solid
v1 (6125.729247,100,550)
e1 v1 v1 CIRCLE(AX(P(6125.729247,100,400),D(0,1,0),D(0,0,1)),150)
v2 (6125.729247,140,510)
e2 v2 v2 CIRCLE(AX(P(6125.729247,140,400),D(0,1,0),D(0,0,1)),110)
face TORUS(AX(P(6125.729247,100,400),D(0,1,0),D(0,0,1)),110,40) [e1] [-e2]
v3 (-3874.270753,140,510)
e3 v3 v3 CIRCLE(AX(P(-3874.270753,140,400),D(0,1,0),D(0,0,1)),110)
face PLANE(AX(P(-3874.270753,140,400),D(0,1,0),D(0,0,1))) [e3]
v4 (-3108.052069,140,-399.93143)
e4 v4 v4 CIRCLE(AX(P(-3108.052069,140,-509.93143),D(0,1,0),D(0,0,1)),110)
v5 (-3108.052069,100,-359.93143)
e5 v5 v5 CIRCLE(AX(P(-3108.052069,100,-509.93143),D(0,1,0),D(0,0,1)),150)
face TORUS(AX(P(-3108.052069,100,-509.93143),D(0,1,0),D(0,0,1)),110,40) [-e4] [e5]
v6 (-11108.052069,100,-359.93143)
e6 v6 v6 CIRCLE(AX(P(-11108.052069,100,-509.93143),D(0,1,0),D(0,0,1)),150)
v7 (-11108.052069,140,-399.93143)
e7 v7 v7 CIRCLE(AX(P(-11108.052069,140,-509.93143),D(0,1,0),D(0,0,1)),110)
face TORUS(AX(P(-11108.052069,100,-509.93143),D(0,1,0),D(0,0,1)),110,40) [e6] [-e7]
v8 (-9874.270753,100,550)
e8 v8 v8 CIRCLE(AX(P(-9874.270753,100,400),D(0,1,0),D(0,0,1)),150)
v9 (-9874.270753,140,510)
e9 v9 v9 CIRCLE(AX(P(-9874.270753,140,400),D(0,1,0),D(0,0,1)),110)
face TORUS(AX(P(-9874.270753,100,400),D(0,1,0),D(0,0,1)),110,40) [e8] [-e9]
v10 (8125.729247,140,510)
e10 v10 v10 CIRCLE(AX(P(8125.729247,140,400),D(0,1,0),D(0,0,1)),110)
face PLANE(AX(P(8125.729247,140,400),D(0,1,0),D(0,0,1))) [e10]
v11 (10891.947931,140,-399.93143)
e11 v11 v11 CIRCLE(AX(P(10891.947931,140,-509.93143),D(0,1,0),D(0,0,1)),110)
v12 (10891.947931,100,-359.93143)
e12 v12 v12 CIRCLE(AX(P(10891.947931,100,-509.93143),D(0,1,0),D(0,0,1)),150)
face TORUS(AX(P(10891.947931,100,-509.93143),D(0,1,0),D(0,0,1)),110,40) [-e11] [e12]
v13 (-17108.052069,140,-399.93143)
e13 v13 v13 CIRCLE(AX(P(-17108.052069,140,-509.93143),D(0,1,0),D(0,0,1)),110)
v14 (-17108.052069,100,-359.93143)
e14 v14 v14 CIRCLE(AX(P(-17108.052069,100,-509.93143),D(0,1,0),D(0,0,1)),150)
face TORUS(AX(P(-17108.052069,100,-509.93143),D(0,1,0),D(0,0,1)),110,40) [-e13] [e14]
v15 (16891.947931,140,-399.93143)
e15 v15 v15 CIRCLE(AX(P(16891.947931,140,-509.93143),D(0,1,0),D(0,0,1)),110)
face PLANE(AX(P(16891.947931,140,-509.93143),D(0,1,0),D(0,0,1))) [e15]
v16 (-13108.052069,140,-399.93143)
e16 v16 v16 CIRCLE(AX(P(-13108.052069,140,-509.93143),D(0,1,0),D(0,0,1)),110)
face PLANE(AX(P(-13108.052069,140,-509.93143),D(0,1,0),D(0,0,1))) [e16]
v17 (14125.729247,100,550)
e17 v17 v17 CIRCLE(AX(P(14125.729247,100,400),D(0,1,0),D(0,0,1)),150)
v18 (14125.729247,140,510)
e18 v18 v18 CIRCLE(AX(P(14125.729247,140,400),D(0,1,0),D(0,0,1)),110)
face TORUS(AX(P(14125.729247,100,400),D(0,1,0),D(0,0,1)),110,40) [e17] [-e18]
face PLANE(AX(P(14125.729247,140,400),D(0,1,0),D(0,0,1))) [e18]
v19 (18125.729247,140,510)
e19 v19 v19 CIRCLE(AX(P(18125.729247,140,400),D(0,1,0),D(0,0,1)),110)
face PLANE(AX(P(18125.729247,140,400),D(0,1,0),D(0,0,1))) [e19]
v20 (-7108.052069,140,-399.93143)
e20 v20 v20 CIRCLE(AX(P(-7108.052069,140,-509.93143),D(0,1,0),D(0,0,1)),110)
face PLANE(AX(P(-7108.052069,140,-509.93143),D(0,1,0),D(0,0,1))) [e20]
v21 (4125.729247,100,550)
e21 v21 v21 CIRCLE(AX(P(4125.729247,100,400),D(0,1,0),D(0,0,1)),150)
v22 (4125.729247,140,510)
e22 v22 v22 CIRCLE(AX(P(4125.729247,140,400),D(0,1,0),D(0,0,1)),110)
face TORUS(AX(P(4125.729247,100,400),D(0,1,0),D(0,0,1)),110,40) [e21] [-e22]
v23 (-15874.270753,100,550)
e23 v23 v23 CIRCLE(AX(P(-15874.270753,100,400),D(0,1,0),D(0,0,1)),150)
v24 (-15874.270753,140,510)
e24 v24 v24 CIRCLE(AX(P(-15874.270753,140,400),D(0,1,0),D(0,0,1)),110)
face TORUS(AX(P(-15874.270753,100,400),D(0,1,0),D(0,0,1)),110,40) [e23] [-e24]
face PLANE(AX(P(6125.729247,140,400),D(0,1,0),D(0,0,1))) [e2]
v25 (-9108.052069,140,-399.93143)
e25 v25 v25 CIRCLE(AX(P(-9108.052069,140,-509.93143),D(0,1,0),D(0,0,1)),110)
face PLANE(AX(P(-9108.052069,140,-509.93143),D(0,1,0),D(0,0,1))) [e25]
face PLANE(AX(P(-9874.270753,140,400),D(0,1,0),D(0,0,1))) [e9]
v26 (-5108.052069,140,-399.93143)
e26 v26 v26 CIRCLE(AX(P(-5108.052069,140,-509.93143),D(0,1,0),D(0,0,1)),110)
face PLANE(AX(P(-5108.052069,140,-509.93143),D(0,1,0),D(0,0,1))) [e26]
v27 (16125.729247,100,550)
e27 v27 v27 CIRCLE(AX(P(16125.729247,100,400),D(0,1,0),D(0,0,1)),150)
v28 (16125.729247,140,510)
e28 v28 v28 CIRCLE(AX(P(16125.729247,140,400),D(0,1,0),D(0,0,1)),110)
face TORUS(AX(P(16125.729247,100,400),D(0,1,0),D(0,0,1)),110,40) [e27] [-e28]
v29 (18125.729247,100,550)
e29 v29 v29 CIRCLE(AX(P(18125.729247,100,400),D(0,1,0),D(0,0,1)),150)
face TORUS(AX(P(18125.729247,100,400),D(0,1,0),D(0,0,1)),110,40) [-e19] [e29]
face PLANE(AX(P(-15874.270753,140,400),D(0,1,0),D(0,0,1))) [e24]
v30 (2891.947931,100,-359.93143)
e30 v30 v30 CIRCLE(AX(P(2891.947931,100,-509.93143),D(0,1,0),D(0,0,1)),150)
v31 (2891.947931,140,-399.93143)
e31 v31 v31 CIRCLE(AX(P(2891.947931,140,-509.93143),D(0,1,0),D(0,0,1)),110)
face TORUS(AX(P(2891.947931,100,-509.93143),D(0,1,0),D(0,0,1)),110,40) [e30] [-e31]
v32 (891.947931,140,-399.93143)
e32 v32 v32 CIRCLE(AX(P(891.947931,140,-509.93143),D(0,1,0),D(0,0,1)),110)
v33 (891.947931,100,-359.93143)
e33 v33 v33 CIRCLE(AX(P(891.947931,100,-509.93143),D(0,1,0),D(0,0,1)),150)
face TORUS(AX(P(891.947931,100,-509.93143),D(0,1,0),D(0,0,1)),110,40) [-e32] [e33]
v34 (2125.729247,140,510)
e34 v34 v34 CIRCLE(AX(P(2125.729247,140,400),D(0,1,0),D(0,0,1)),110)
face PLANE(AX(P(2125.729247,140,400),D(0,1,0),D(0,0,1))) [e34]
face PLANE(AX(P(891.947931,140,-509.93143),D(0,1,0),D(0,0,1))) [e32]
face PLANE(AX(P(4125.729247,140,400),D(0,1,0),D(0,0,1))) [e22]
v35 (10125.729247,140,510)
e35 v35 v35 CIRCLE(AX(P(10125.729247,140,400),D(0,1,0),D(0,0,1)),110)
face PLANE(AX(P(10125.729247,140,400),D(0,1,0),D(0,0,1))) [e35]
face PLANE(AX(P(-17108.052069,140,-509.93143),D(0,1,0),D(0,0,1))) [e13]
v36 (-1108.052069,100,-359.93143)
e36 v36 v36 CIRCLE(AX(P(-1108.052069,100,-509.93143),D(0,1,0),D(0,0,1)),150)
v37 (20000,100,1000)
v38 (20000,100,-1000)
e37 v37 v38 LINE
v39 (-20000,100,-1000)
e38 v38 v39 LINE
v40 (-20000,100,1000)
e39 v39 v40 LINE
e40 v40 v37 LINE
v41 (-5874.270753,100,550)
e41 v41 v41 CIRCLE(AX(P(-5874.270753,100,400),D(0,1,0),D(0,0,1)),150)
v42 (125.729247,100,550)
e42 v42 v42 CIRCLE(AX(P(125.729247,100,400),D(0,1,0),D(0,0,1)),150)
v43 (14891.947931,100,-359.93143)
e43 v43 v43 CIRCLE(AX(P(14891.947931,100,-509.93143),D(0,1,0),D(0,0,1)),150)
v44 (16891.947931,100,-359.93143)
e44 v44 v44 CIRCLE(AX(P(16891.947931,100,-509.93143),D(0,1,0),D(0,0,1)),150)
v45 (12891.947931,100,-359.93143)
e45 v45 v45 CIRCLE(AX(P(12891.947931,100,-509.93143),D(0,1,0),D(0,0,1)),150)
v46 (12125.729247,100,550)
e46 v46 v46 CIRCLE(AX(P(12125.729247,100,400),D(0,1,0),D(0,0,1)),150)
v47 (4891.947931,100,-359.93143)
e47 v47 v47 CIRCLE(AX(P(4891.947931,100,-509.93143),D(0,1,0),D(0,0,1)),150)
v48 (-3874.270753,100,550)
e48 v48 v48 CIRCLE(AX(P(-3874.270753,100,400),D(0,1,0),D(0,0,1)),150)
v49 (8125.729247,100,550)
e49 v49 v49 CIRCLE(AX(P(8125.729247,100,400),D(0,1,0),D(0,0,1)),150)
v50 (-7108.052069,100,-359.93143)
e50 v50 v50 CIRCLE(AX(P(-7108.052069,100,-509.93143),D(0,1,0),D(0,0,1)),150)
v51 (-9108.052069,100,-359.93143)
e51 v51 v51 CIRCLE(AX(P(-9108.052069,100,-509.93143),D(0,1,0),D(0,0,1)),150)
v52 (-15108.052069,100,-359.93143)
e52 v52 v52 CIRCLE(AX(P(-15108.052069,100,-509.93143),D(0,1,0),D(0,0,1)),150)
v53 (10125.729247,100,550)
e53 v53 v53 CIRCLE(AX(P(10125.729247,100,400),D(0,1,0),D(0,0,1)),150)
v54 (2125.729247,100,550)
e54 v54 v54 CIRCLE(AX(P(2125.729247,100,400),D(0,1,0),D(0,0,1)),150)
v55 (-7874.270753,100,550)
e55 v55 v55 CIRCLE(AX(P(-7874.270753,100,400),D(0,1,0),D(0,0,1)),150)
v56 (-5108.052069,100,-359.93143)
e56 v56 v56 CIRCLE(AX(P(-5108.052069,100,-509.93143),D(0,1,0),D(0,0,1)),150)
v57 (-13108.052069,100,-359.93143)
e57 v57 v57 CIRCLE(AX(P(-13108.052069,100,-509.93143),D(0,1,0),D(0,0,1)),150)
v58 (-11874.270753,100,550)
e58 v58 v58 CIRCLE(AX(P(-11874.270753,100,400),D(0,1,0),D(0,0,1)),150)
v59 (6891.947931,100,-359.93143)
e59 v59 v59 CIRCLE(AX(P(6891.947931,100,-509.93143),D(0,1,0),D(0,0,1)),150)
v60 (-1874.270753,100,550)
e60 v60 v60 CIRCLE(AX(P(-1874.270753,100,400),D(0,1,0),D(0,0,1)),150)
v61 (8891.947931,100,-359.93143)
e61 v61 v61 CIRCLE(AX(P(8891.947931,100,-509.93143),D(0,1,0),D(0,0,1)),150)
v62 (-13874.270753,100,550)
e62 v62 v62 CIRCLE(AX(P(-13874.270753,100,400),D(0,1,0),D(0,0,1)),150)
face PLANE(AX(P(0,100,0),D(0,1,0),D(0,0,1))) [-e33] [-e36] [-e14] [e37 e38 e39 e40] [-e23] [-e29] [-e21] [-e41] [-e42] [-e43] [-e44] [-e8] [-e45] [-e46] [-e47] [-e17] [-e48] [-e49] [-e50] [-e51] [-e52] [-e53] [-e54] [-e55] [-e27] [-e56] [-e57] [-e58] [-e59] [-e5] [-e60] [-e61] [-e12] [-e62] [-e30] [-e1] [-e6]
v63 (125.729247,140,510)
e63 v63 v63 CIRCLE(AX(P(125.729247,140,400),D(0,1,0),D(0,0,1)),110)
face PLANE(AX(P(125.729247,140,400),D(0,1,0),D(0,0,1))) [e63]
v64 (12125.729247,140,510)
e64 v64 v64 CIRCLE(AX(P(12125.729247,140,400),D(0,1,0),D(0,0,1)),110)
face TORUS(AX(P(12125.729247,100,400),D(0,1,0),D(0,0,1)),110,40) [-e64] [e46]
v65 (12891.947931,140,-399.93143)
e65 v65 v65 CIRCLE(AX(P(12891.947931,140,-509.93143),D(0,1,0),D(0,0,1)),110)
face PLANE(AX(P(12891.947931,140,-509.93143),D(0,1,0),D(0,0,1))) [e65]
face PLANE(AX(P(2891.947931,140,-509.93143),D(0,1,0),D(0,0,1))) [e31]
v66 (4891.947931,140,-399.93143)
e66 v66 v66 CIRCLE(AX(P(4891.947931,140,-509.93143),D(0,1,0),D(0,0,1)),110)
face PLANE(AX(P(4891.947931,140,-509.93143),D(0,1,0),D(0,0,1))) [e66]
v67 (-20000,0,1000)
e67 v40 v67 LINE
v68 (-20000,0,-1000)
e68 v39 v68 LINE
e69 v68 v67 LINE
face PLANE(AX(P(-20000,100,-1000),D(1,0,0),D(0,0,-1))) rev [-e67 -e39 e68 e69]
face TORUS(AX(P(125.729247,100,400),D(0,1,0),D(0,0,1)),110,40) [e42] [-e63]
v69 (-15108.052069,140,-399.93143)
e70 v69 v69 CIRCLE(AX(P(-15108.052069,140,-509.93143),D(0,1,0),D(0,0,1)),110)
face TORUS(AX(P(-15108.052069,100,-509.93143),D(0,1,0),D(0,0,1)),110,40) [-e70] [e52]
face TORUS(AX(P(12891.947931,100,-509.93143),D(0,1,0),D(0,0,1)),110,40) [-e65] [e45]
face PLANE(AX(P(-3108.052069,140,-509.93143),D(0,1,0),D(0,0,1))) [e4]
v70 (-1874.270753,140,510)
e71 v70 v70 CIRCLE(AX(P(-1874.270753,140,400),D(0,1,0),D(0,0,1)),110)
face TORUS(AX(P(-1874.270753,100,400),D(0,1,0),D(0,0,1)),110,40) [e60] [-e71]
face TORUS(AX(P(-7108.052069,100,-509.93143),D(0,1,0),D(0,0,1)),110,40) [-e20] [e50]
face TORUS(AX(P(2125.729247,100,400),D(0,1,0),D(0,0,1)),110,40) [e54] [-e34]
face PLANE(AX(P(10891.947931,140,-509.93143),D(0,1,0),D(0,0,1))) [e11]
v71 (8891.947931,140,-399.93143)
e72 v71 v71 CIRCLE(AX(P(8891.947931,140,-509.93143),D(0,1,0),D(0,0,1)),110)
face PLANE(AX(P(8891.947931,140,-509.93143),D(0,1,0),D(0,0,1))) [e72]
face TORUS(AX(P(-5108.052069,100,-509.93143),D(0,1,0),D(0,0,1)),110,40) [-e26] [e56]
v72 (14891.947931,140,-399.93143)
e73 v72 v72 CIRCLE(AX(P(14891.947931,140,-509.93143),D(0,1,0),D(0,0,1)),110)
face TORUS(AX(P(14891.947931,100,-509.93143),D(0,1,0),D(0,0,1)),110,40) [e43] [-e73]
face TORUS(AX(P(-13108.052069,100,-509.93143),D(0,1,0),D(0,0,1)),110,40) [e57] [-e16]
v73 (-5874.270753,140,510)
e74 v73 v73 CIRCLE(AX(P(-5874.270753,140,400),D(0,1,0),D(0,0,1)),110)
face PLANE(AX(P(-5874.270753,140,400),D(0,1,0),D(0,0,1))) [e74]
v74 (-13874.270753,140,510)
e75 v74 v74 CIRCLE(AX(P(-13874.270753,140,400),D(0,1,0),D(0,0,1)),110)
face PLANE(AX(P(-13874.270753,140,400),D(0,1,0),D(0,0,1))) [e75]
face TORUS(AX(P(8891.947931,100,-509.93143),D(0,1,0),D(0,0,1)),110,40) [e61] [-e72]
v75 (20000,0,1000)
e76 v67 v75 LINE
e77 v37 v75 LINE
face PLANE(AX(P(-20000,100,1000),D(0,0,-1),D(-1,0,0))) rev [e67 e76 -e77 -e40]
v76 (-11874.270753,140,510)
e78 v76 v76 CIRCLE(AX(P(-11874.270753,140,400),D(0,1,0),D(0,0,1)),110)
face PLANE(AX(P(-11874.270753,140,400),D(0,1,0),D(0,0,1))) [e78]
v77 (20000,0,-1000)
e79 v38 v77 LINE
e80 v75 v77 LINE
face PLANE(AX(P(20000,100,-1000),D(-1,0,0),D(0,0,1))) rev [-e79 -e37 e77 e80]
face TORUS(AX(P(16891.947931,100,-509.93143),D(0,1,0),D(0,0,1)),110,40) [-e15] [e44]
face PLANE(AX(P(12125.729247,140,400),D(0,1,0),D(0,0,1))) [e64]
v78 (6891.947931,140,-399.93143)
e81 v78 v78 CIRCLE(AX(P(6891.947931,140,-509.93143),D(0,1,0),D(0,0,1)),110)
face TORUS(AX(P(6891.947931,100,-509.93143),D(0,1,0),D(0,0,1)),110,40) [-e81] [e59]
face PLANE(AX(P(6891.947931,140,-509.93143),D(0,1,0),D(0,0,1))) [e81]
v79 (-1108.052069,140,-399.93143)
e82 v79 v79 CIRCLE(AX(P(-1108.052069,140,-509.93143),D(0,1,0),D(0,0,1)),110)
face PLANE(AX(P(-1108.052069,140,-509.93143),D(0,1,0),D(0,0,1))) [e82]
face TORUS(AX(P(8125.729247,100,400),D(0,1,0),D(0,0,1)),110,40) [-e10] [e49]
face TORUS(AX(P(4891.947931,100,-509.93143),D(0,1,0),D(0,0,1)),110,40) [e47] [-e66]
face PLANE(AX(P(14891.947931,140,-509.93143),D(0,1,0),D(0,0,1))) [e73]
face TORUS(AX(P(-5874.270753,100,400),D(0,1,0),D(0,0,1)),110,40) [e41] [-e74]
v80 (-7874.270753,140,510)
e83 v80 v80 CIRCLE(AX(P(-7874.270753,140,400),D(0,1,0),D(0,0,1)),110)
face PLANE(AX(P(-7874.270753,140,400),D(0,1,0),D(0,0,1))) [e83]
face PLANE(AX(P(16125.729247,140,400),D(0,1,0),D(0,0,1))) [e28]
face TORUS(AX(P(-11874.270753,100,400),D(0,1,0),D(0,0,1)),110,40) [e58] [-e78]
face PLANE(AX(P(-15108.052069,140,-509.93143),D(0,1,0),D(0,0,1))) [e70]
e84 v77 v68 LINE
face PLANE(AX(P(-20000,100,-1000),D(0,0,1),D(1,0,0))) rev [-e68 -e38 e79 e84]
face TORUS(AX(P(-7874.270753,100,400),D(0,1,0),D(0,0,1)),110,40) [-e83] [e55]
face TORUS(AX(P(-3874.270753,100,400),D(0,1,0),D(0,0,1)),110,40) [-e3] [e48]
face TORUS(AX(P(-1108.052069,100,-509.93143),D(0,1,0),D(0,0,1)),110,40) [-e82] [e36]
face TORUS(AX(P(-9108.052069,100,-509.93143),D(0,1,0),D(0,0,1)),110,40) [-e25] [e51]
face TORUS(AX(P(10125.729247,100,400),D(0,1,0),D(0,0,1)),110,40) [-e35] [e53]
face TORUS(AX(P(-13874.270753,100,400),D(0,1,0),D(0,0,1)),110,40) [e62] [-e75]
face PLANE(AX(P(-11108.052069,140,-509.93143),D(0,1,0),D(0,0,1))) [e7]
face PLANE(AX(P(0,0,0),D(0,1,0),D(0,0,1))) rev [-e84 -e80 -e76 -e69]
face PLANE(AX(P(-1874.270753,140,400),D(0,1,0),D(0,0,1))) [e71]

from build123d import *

# Parameters (mm, degrees)
CROQUIS1_W              = 40000
CROQUIS1_H              = 2000
SALIENTE_EXTRUIR1_DEPTH = 100
CROQUIS2_R              = 150
SALIENTE_EXTRUIR2_DEPTH = 40
REDONDEO1_R             = 40


with BuildPart() as part:
    # Croquis1 → Saliente-Extruir1 (new body)
    with BuildSketch(Plane(origin=(0, 0, 0), x_dir=(1, 0, 0), z_dir=(0, 1, 0))):
        Rectangle(CROQUIS1_W, CROQUIS1_H)
    extrude(amount=SALIENTE_EXTRUIR1_DEPTH)

    # Croquis2 → Saliente-Extruir2 (add)
    with BuildSketch(Plane(origin=(0, 100, 0), x_dir=(1, 0, 0), z_dir=(0, 1, 0))):
        with Locations(Location((-17108.052068539, 509.931430003, 0), (0, 0, 270))):
            Circle(CROQUIS2_R)
        with Locations(Location((-15874.270753097, -400, 0), (0, 0, 270))):
            Circle(CROQUIS2_R)
        with Locations(Location((-13874.270753097, -400, 0), (0, 0, 270))):
            Circle(CROQUIS2_R)
        with Locations(Location((-15108.052068539, 509.931430003, 0), (0, 0, 270))):
            Circle(CROQUIS2_R)
        with Locations(Location((-11874.270753097, -400, 0), (0, 0, 270))):
            Circle(CROQUIS2_R)
        with Locations(Location((-13108.052068539, 509.931430003, 0), (0, 0, 270))):
            Circle(CROQUIS2_R)
        with Locations(Location((-9874.270753097, -400, 0), (0, 0, 270))):
            Circle(CROQUIS2_R)
        with Locations(Location((-11108.052068539, 509.931430003, 0), (0, 0, 270))):
            Circle(CROQUIS2_R)
        with Locations(Location((-7874.270753097, -400, 0), (0, 0, 270))):
            Circle(CROQUIS2_R)
        with Locations(Location((-9108.052068539, 509.931430003, 0), (0, 0, 270))):
            Circle(CROQUIS2_R)
        with Locations(Location((-5874.270753097, -400, 0), (0, 0, 270))):
            Circle(CROQUIS2_R)
        with Locations(Location((-7108.052068539, 509.931430003, 0), (0, 0, 270))):
            Circle(CROQUIS2_R)
        with Locations(Location((-3874.270753097, -400, 0), (0, 0, 270))):
            Circle(CROQUIS2_R)
        with Locations(Location((-5108.052068539, 509.931430003, 0), (0, 0, 270))):
            Circle(CROQUIS2_R)
        with Locations(Location((-1874.270753097, -400, 0), (0, 0, 270))):
            Circle(CROQUIS2_R)
        with Locations(Location((-3108.052068539, 509.931430003, 0), (0, 0, 270))):
            Circle(CROQUIS2_R)
        with Locations(Location((125.729246903, -400, 0), (0, 0, 270))):
            Circle(CROQUIS2_R)
        with Locations(Location((-1108.052068539, 509.931430003, 0), (0, 0, 270))):
            Circle(CROQUIS2_R)
        with Locations(Location((2125.729246903, -400, 0), (0, 0, 270))):
            Circle(CROQUIS2_R)
        with Locations(Location((891.947931461, 509.931430003, 0), (0, 0, 270))):
            Circle(CROQUIS2_R)
        with Locations(Location((4125.729246903, -400, 0), (0, 0, 270))):
            Circle(CROQUIS2_R)
        with Locations(Location((2891.947931461, 509.931430003, 0), (0, 0, 270))):
            Circle(CROQUIS2_R)
        with Locations(Location((6125.729246903, -400, 0), (0, 0, 270))):
            Circle(CROQUIS2_R)
        with Locations(Location((4891.947931461, 509.931430003, 0), (0, 0, 270))):
            Circle(CROQUIS2_R)
        with Locations(Location((8125.729246903, -400, 0), (0, 0, 270))):
            Circle(CROQUIS2_R)
        with Locations(Location((6891.947931461, 509.931430003, 0), (0, 0, 270))):
            Circle(CROQUIS2_R)
        with Locations(Location((10125.729246903, -400, 0), (0, 0, 270))):
            Circle(CROQUIS2_R)
        with Locations(Location((8891.947931461, 509.931430003, 0), (0, 0, 270))):
            Circle(CROQUIS2_R)
        with Locations(Location((12125.729246903, -400, 0), (0, 0, 270))):
            Circle(CROQUIS2_R)
        with Locations(Location((10891.947931461, 509.931430003, 0), (0, 0, 270))):
            Circle(CROQUIS2_R)
        with Locations(Location((14125.729246903, -400, 0), (0, 0, 270))):
            Circle(CROQUIS2_R)
        with Locations(Location((12891.947931461, 509.931430003, 0), (0, 0, 270))):
            Circle(CROQUIS2_R)
        with Locations(Location((16125.729246903, -400, 0), (0, 0, 270))):
            Circle(CROQUIS2_R)
        with Locations(Location((14891.947931461, 509.931430003, 0), (0, 0, 270))):
            Circle(CROQUIS2_R)
        with Locations(Location((18125.729246903, -400, 0), (0, 0, 270))):
            Circle(CROQUIS2_R)
        with Locations(Location((16891.947931461, 509.931430003, 0), (0, 0, 270))):
            Circle(CROQUIS2_R)
    extrude(amount=SALIENTE_EXTRUIR2_DEPTH)

    # Redondeo1
    redondeo1_edges = [part.edges().sort_by_distance(p)[0] for p in [
        (10891.947931461, 140, -659.931430003),
        (12125.729246903, 140, 250),
        (12891.947931461, 140, -659.931430003),
        (14125.729246903, 140, 250),
        (14891.947931461, 140, -659.931430003),
        (16125.729246903, 140, 250),
        (16891.947931461, 140, -659.931430003),
        (18125.729246903, 140, 250),
        (-17108.052068539, 140, -659.931430003),
        (-15874.270753097, 140, 250),
        (-15108.052068539, 140, -659.931430003),
        (-13874.270753097, 140, 250),
        (-13108.052068539, 140, -659.931430003),
        (-11874.270753097, 140, 250),
        (-11108.052068539, 140, -659.931430003),
        (-9874.270753097, 140, 250),
        (-9108.052068539, 140, -659.931430003),
        (-7874.270753097, 140, 250),
        (-7108.052068539, 140, -659.931430003),
        (-5874.270753097, 140, 250),
        (-5108.052068539, 140, -659.931430003),
        (-3874.270753097, 140, 250),
        (-3108.052068539, 140, -659.931430003),
        (-1874.270753097, 140, 250),
        (-1108.052068539, 140, -659.931430003),
        (125.729246903, 140, 250),
        (891.947931461, 140, -659.931430003),
        (2125.729246903, 140, 250),
        (2891.947931461, 140, -659.931430003),
        (4125.729246903, 140, 250),
        (4891.947931461, 140, -659.931430003),
        (6125.729246903, 140, 250),
        (6891.947931461, 140, -659.931430003),
        (8125.729246903, 140, 250),
        (8891.947931461, 140, -659.931430003),
        (10125.729246903, 140, 250),
    ]]
    fillet(redondeo1_edges, radius=REDONDEO1_R - 0.0001)  # a hair under: the kernel refuses the full size


solid = part.part
